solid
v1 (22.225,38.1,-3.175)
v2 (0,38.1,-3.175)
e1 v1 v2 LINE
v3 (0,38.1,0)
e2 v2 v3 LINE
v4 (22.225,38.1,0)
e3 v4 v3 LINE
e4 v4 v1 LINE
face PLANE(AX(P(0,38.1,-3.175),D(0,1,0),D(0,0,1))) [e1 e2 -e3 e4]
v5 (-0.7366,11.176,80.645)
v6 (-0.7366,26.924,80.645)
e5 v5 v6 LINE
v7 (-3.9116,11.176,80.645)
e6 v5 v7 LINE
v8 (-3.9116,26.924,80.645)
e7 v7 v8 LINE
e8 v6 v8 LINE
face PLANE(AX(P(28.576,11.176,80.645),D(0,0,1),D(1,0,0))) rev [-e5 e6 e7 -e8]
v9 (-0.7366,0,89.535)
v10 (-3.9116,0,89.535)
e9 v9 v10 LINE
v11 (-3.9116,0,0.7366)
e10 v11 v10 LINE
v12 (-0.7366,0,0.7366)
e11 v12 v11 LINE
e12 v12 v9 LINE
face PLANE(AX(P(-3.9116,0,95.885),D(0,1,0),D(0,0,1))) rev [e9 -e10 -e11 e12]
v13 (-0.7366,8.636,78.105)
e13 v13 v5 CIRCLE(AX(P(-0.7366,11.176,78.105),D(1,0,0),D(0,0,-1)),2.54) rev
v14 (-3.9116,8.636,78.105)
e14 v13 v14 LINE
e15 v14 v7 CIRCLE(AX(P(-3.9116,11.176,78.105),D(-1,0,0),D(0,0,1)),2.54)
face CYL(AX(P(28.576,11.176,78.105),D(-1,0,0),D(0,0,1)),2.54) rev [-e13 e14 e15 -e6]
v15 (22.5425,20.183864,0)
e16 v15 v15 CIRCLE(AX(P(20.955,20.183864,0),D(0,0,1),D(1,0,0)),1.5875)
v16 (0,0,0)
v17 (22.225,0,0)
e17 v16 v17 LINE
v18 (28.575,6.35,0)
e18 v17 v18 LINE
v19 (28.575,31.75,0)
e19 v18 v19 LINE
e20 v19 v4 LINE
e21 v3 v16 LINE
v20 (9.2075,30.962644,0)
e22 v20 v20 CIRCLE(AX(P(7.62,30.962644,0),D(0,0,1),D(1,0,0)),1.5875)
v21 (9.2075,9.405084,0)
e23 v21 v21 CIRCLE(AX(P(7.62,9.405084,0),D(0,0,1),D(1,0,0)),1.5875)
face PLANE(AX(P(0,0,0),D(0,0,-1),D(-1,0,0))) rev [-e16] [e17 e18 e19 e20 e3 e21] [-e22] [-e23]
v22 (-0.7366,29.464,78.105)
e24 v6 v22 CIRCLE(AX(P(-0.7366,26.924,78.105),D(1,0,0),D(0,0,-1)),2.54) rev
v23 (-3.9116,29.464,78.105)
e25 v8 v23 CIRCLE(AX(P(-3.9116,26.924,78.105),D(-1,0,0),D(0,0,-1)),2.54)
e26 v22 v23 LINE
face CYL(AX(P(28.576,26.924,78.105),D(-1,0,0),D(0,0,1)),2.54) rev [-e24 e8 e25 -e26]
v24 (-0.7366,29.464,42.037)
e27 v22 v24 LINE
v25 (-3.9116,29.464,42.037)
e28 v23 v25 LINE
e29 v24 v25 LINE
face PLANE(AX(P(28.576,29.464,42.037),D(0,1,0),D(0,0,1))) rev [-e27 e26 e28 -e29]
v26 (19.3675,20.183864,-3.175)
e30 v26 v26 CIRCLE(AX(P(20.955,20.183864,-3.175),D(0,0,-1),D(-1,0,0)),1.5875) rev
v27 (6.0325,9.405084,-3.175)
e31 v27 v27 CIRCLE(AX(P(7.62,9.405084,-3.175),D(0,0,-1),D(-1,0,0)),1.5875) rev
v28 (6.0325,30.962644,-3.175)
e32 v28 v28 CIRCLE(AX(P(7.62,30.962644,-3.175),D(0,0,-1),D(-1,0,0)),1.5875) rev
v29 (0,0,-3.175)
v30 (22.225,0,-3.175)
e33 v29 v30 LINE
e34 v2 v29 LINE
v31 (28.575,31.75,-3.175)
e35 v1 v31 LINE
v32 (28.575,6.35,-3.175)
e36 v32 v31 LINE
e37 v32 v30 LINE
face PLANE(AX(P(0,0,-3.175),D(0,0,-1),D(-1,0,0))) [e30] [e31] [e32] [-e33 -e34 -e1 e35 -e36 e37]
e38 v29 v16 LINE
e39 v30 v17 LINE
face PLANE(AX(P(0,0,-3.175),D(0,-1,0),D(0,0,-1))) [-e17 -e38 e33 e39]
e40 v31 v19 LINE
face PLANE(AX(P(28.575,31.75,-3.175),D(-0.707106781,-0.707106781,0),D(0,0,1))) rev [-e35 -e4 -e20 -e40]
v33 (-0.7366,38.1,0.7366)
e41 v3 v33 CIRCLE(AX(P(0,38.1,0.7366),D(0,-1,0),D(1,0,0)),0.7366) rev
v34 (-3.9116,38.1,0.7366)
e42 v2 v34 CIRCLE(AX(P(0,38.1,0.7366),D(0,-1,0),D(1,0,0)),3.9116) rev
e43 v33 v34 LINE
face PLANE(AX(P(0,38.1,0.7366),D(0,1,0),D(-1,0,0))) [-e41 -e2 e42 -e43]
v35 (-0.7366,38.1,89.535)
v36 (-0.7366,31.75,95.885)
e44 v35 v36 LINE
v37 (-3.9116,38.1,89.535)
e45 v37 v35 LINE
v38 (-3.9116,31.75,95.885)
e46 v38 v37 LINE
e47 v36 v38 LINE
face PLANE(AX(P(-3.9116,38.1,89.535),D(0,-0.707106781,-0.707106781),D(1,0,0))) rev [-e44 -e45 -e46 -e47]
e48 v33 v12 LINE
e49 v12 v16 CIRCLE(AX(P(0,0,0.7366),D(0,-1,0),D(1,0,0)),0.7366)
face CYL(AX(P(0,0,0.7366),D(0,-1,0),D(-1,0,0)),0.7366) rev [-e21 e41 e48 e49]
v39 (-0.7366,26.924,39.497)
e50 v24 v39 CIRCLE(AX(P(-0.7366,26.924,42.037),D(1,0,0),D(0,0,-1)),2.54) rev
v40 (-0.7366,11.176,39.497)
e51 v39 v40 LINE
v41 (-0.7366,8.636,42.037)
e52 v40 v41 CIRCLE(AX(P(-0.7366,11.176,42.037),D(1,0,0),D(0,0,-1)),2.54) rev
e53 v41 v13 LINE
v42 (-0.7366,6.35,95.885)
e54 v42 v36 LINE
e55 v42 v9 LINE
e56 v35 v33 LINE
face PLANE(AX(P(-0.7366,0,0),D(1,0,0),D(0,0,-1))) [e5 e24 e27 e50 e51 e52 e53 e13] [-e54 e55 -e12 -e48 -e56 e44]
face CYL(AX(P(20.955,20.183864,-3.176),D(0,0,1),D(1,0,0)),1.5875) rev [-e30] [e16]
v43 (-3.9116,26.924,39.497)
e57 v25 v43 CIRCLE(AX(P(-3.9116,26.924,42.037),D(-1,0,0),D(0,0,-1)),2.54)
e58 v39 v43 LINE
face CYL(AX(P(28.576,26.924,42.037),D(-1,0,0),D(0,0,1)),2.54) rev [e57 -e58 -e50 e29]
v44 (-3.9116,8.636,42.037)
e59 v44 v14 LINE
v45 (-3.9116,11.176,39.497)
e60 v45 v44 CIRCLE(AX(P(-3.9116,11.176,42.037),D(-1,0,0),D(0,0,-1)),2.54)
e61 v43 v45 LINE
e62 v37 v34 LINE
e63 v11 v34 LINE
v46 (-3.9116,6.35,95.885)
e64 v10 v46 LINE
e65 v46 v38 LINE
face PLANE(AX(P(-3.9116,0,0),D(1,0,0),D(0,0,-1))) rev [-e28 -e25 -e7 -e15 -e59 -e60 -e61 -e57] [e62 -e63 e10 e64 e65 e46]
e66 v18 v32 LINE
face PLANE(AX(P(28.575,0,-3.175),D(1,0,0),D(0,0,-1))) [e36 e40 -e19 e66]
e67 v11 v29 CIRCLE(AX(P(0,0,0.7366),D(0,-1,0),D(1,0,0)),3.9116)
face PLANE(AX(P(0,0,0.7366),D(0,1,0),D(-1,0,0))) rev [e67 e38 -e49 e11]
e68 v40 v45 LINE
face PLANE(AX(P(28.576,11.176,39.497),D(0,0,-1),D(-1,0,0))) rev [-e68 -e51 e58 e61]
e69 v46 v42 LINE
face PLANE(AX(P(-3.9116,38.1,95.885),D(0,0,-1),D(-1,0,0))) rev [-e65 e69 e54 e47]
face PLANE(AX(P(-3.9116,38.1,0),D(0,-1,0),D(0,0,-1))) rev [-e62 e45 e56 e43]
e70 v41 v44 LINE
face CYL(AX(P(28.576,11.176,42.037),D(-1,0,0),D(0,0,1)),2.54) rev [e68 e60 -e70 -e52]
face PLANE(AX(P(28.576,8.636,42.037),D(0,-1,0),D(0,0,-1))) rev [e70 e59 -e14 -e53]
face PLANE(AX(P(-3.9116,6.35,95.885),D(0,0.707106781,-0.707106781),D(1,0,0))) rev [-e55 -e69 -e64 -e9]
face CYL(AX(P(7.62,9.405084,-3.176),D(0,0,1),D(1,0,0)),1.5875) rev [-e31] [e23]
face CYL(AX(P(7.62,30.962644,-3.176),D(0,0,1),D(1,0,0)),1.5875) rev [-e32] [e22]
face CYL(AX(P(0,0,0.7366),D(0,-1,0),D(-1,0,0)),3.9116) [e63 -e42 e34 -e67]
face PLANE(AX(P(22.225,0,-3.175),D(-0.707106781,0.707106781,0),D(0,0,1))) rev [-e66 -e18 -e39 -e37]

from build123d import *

# Parameters (mm, degrees)
SKETCH1_W                 = 28.575
SKETCH1_H                 = 38.1
BASE_FLANGE1_DEPTH        = 3.175
EDGE_FLANGE1_DEPTH        = 38.1
BREAK_CORNER1_START       = 42.656216575
BREAK_CORNER1_OUTLINE_W   = 32
BREAK_CORNER1_OUTLINE_H   = 6
BREAK_CORNER1_DEPTH       = 4.490128061
BREAK_CORNER1_START_2     = 15.715448212
BREAK_CORNER1_2_OUTLINE_W = 32
BREAK_CORNER1_2_OUTLINE_H = 6
BREAK_CORNER1_2_DEPTH     = 4.49012806
BREAK_CORNER1_START_3     = 90.251574017
BREAK_CORNER1_3_OUTLINE_W = 6
BREAK_CORNER1_3_OUTLINE_H = 32
BREAK_CORNER1_3_DEPTH     = 4.49012806
BREAK_CORNER1_START_4     = -67.800933714
BREAK_CORNER1_4_OUTLINE_W = 6
BREAK_CORNER1_4_OUTLINE_H = 31
BREAK_CORNER1_4_DEPTH     = 4.49012806
CUT_EXTRUDE1_REACH        = 110.171
CUT_EXTRUDE2_REACH        = 109.061
SKETCH10_R                = 1.5875


# Read off the part's stored shape, not the designer's step: Break-Corner1
# Sheet-metal steps are written as plain solids
with BuildPart() as part:
    # Sketch1 → Base-Flange1 (new body)
    with BuildSketch(Plane.XY):
        with Locations((14.2875, 19.05)):
            Rectangle(SKETCH1_W, SKETCH1_H)
    extrude(amount=-BASE_FLANGE1_DEPTH)

    # Edge-Flange1 section (across the edge) → Edge-Flange1 (add)
    with BuildSketch(Plane(origin=(-0.7366, 38.1, 0), x_dir=(1, 0, 0), z_dir=(0, -1, 0))):
        with BuildLine():
            Line((-3.175, 0.7366), (-3.175, 95.885))
            Line((-3.175, 95.885), (0, 95.885))
            Line((0, 95.885), (0, 0.7366))
            ThreePointArc((0, 0.7366), (0.215745145, 0.215745145), (0.7366, 0))
            Line((0.7366, 0), (0.7366, -3.175))
            ThreePointArc((0.7366, -3.175), (-2.029318885, -2.029318885), (-3.175, 0.7366))
        make_face()
    extrude(amount=EDGE_FLANGE1_DEPTH)

    # Break-Corner1 outline → Break-Corner1 (cut)
    with BuildSketch(Plane(origin=(0, 0, 0), x_dir=(0.707106781186548, -0.707106781186547, 0), z_dir=(0.707106781186547, 0.707106781186548, 0)).offset(BREAK_CORNER1_START)):
        with Locations((3, 2)):
            Rectangle(BREAK_CORNER1_OUTLINE_W, BREAK_CORNER1_OUTLINE_H)
    extrude(amount=BREAK_CORNER1_DEPTH, mode=Mode.SUBTRACT)

    # Break-Corner1 2 outline → Break-Corner1 2 (cut)
    with BuildSketch(Plane(origin=(0, 0, 0), x_dir=(0.707106781186548, 0.707106781186547, 0), z_dir=(0.707106781186547, -0.707106781186548, 0)).offset(BREAK_CORNER1_START_2)):
        with Locations((30, -2)):
            Rectangle(BREAK_CORNER1_2_OUTLINE_W, BREAK_CORNER1_2_OUTLINE_H)
    extrude(amount=BREAK_CORNER1_2_DEPTH, mode=Mode.SUBTRACT)

    # Break-Corner1 3 outline → Break-Corner1 3 (cut)
    with BuildSketch(Plane(origin=(0, 0, 0), x_dir=(1, 0, 0), z_dir=(0, 0.707106781186548, 0.707106781186547)).offset(BREAK_CORNER1_START_3)):
        with Locations((-2, -51)):
            Rectangle(BREAK_CORNER1_3_OUTLINE_W, BREAK_CORNER1_3_OUTLINE_H)
    extrude(amount=BREAK_CORNER1_3_DEPTH, mode=Mode.SUBTRACT)

    # Break-Corner1 4 outline → Break-Corner1 4 (cut)
    with BuildSketch(Plane(origin=(0, 0, 0), x_dir=(1, 0, 0), z_dir=(0, 0.707106781186548, -0.707106781186547)).offset(BREAK_CORNER1_START_4)):
        with Locations((-2, -77.5)):
            Rectangle(BREAK_CORNER1_4_OUTLINE_W, BREAK_CORNER1_4_OUTLINE_H)
    extrude(amount=BREAK_CORNER1_4_DEPTH, mode=Mode.SUBTRACT)

    # Sketch9 → Cut-Extrude1 (cut, up to next)
    with BuildSketch(Plane.ZY.offset(3.9116), mode=Mode.PRIVATE) as cut_extrude1_sk1:
        with BuildLine():
            Line((42.037, 8.636), (78.105, 8.636))
            ThreePointArc((78.105, 8.636), (79.901051224, 9.379948776), (80.645, 11.176))
            Line((80.645, 11.176), (80.645, 26.924))
            ThreePointArc((80.645, 26.924), (79.901051224, 28.720051224), (78.105, 29.464))
            Line((78.105, 29.464), (42.037, 29.464))
            ThreePointArc((42.037, 29.464), (40.240948776, 28.720051224), (39.497, 26.924))
            Line((39.497, 26.924), (39.497, 11.176))
            ThreePointArc((39.497, 11.176), (40.240948776, 9.379948776), (42.037, 8.636))
        make_face()
    cut_extrude1_tool1 = extrude(cut_extrude1_sk1.sketch, amount=-CUT_EXTRUDE1_REACH, mode=Mode.PRIVATE) & part.part
    add(cut_extrude1_tool1.solids().sort_by_distance((-3.9116, 19.05, 60.071))[0], mode=Mode.SUBTRACT)

    # Sketch10 → Cut-Extrude2 (cut, up to next)
    with BuildSketch(Plane.XY, mode=Mode.PRIVATE) as cut_extrude2_sk1:
        with Locations((7.62, 30.96264399)):
            Circle(SKETCH10_R)
    cut_extrude2_tool1 = extrude(cut_extrude2_sk1.sketch, amount=-CUT_EXTRUDE2_REACH, mode=Mode.PRIVATE) & part.part
    # Sketch10 → Cut-Extrude2 (cut, up to next)
    with BuildSketch(Plane.XY, mode=Mode.PRIVATE) as cut_extrude2_sk2:
        with Locations((20.955, 20.183863844)):
            Circle(SKETCH10_R)
    cut_extrude2_tool2 = extrude(cut_extrude2_sk2.sketch, amount=-CUT_EXTRUDE2_REACH, mode=Mode.PRIVATE) & part.part
    # Sketch10 → Cut-Extrude2 (cut, up to next)
    with BuildSketch(Plane.XY, mode=Mode.PRIVATE) as cut_extrude2_sk3:
        with Locations((7.62, 9.405083697)):
            Circle(SKETCH10_R)
    cut_extrude2_tool3 = extrude(cut_extrude2_sk3.sketch, amount=-CUT_EXTRUDE2_REACH, mode=Mode.PRIVATE) & part.part
    add(cut_extrude2_tool1.solids().sort_by_distance((7.62, 30.962644, 0))[0], mode=Mode.SUBTRACT)
    add(cut_extrude2_tool2.solids().sort_by_distance((20.955, 20.183864, 0))[0], mode=Mode.SUBTRACT)
    add(cut_extrude2_tool3.solids().sort_by_distance((7.62, 9.405084, 0))[0], mode=Mode.SUBTRACT)


solid = part.part
